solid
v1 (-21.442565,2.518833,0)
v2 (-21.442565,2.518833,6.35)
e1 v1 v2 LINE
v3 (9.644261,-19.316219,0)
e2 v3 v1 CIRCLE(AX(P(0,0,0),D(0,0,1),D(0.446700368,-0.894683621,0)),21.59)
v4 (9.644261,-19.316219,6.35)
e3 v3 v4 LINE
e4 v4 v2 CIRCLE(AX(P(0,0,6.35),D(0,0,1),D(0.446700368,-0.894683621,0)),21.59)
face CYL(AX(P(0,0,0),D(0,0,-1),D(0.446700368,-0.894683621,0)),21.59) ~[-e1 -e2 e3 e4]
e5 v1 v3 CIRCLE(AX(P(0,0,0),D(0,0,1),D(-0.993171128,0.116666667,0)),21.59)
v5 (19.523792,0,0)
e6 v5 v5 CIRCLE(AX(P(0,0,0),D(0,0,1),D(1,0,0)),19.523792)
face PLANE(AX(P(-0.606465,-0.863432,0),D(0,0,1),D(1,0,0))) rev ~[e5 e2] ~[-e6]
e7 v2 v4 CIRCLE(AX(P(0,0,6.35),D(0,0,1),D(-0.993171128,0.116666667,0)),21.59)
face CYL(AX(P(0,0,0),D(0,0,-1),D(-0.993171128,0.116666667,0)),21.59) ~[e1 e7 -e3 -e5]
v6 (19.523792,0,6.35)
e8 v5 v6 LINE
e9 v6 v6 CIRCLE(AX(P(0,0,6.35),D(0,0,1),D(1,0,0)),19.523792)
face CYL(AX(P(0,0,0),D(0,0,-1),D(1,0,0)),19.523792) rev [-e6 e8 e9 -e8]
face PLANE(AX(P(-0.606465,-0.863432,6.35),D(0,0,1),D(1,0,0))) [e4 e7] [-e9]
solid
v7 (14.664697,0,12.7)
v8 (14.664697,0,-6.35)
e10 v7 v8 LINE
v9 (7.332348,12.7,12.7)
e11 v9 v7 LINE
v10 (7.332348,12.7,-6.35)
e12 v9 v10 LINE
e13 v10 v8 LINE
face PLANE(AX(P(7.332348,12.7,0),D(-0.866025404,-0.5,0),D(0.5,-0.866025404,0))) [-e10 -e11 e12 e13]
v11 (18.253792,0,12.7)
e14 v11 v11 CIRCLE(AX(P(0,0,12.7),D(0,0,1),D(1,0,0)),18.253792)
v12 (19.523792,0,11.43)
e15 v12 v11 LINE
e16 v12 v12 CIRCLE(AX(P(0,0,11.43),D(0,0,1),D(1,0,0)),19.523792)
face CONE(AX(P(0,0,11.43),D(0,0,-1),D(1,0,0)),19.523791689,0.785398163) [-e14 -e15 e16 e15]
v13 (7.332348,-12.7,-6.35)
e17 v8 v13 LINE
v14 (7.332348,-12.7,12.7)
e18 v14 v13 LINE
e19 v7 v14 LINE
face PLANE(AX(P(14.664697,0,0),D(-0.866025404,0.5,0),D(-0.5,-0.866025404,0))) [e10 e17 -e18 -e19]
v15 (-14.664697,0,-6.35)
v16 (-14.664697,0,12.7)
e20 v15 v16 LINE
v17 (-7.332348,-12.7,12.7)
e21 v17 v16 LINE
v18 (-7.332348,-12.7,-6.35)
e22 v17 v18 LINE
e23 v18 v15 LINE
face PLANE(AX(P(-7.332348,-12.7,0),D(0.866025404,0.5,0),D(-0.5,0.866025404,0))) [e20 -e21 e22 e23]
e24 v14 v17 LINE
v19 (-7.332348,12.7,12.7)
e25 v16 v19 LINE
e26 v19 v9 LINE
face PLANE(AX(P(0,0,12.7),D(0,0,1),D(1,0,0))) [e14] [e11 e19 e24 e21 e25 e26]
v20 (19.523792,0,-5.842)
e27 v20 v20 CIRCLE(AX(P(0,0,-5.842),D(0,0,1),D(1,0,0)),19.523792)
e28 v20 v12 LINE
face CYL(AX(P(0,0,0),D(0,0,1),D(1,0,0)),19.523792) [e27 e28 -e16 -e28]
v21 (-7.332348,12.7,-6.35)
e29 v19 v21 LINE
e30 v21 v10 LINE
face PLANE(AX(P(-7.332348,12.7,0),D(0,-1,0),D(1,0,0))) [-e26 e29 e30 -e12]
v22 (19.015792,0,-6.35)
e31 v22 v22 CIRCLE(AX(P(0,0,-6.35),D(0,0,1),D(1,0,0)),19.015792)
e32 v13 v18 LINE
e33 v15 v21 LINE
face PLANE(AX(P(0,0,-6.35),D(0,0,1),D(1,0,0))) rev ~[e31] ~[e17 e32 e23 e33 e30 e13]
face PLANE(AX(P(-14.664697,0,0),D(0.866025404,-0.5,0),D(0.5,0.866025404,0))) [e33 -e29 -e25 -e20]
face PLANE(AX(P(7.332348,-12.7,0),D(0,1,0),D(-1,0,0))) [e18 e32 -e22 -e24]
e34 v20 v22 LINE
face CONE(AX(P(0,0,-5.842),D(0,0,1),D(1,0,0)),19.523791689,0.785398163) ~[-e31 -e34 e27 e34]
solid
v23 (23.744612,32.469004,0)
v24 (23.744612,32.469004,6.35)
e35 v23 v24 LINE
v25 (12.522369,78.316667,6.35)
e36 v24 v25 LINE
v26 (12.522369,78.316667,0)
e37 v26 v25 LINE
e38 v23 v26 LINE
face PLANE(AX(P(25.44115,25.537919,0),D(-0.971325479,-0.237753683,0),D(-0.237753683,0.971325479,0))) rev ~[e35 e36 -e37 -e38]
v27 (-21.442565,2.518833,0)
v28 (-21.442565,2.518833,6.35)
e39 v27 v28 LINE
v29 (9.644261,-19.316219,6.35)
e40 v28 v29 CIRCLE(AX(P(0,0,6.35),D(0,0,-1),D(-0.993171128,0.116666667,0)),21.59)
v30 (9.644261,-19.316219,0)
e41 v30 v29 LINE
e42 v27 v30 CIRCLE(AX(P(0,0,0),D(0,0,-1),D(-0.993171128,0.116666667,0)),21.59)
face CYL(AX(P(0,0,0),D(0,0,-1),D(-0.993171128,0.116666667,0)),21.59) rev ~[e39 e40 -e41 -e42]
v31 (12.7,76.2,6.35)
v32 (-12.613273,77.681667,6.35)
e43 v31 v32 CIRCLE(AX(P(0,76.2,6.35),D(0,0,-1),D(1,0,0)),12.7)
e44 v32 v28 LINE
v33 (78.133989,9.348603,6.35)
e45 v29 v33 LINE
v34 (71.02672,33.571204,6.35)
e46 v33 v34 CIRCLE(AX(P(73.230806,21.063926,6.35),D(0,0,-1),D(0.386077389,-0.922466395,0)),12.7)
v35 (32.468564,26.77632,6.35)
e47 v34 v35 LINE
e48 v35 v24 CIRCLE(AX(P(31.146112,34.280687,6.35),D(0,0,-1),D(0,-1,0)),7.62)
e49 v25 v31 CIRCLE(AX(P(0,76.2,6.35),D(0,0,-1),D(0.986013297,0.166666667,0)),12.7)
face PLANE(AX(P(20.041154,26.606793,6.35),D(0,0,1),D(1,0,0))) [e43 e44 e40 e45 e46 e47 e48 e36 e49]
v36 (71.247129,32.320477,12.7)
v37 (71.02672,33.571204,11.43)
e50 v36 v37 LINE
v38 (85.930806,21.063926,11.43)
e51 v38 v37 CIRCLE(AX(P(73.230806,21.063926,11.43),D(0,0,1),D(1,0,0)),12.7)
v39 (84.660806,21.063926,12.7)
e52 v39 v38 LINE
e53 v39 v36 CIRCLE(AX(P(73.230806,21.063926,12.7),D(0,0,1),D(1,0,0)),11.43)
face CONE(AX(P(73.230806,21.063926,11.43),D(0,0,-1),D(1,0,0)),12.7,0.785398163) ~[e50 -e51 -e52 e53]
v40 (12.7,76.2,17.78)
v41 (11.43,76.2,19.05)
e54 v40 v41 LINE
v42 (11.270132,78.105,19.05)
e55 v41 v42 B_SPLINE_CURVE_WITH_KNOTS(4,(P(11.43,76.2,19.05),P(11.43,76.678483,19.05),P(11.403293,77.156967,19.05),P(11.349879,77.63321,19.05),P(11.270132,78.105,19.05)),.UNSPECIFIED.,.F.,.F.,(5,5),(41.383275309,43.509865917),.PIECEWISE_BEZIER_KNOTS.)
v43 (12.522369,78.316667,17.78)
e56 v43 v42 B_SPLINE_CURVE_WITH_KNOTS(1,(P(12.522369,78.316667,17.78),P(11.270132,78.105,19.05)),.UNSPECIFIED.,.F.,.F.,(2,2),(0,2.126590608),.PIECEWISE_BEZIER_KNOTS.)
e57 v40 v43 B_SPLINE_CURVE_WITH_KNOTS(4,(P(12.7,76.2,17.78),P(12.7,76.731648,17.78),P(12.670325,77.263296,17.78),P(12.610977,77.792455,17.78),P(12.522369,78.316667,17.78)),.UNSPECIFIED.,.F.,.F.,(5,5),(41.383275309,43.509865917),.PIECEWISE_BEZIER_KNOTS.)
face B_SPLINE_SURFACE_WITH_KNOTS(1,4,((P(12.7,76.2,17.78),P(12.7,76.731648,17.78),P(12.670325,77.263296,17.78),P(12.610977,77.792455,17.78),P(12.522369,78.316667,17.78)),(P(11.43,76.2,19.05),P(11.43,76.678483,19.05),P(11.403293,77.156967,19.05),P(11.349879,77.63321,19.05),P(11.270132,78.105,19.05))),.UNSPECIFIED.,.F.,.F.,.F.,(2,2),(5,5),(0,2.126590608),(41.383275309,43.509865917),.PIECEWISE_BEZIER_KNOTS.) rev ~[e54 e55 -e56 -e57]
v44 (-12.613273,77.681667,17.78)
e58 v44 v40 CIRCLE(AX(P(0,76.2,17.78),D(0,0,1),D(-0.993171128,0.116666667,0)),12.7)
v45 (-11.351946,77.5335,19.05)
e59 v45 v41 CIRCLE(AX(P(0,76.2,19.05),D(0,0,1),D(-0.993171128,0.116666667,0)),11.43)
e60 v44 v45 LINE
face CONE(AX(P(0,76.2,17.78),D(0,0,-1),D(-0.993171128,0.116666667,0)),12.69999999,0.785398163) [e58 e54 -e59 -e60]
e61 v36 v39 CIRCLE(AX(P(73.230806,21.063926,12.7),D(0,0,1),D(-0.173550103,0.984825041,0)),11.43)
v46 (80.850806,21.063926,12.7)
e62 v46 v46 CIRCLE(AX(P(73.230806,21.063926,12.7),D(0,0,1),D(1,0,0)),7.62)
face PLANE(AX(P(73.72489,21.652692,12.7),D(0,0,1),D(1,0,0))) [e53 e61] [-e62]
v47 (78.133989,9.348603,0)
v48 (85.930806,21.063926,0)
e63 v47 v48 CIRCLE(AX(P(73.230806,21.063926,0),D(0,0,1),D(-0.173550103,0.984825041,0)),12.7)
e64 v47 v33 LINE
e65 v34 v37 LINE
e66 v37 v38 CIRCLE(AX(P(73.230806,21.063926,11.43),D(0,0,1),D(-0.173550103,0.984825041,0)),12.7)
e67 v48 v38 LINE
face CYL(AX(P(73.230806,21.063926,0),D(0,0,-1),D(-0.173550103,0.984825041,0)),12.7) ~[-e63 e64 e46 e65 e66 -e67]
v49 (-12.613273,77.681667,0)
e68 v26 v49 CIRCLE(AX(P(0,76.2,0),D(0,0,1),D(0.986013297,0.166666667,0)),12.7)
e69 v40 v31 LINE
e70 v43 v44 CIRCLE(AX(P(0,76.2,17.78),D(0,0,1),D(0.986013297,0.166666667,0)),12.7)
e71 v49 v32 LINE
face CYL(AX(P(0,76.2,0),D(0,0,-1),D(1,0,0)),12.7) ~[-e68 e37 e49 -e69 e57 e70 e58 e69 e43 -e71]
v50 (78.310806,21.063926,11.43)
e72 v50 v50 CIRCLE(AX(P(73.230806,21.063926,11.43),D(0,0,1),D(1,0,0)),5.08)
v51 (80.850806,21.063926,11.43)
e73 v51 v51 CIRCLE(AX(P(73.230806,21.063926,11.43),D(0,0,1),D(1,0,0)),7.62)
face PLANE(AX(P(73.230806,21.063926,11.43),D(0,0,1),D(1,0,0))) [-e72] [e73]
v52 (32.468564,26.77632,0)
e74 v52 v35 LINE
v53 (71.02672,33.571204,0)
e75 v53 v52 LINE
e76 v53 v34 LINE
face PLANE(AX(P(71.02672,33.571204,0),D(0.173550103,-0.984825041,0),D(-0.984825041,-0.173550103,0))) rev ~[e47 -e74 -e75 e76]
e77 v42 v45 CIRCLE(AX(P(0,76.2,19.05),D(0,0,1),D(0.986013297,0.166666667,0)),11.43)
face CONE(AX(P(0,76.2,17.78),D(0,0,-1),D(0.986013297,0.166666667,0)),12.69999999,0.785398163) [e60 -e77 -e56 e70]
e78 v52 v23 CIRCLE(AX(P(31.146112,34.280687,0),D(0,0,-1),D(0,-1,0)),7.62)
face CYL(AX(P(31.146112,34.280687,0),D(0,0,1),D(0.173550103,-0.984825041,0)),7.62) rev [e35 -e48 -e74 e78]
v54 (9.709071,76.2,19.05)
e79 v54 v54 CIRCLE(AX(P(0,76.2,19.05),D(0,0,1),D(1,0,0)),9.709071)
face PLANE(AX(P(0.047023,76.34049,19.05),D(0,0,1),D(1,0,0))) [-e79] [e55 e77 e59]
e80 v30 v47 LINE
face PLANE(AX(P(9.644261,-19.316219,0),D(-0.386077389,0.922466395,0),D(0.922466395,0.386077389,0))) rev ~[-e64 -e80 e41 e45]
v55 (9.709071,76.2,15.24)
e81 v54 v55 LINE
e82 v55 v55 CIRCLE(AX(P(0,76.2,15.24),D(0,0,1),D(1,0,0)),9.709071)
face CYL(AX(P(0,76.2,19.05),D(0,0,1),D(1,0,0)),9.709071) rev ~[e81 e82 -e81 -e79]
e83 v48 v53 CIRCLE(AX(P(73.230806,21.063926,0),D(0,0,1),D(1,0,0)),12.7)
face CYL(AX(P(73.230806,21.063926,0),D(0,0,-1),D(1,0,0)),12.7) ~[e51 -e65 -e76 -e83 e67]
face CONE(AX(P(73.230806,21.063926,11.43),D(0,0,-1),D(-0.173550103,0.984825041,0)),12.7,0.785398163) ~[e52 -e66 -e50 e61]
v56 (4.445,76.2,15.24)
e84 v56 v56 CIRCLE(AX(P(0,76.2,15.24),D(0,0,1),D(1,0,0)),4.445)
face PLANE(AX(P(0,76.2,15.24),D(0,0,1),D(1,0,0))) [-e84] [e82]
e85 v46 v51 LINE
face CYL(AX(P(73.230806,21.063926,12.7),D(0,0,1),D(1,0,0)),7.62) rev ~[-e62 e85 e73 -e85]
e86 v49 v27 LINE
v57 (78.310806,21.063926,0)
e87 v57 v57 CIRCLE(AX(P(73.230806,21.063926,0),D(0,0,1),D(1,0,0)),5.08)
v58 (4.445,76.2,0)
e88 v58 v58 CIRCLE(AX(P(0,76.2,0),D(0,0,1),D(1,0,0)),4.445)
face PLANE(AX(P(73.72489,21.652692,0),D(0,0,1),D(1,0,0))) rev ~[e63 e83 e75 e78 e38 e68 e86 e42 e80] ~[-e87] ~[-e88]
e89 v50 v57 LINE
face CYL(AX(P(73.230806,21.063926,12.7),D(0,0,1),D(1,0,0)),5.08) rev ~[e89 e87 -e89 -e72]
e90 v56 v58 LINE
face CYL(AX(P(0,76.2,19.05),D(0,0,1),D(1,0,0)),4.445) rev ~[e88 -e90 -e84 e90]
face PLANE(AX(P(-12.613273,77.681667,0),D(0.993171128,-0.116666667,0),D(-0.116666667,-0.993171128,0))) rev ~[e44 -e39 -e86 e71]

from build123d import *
from build123d import SkipClean  # not in build123d's __all__

# Parameters (mm, degrees)
F1_DEPTH  = 6.35
F0_R      = 19.5237916893
F2_DEPTH  = 12.7
F3_DEPTH  = 6.35
F4_DEPTH  = 12.7
F5_SIZE   = 1.27
F5_2_SIZE = 1.27
F6_R      = 4.445
F7_DEPTH  = 25.4
F8_R      = 9.7090709229
F9_DEPTH  = 3.81
F10_R     = 5.08
F11_DEPTH = 25.4
F10_R_2   = 7.62
F12_DEPTH = 1.27
F13_DEPTH = 6.35
F14_DEPTH = 6.35
F15_R     = 7.62
F16_SIZE  = 0.508


# Not quite as in the source:
# - after a boolean that leaves OpenCascade's solid faulty, fix() repairs it
# - a feature names something its author has since deleted; it is built from what else it names


with BuildPart() as f1:
    # F0 (on Top) → F1 (new body)
    with BuildSketch(Plane.XY):
        with BuildLine():
            ThreePointArc((12.5223688742, 78.3166666667), (12.6555143061, 77.2620535056), (12.7, 76.2))
            ThreePointArc((12.7, 76.2), (-0.7421013455, 63.5217002089), (-12.6132733217, 77.6816666667))
            Line((-12.6132733217, 77.6816666667), (-21.442564647, 2.5188333333))
            ThreePointArc((-21.442564647, 2.5188333333), (1.2615722873, 21.5531096449), (21.59, 0))
            ThreePointArc((21.59, 0), (18.3622941649, -11.3558026137), (9.644260954, -19.3162193674))
            Line((9.644260954, -19.3162193674), (78.13398925, 9.348603097))
            ThreePointArc((78.13398925, 9.348603097), (61.0445484479, 17.4882981523), (71.0267201121, 33.5712043384))
            Line((71.0267201121, 33.5712043384), (25.4411503373, 25.5379192568))
            Line((25.4411503373, 25.5379192568), (12.5223688742, 78.3166666667))
        make_face()
    extrude(amount=F1_DEPTH)

    # F0 (on Top) → F2, piece 2 (join)
    with BuildSketch(Plane.XY):
        with BuildLine():
            ThreePointArc((-12.6132733217, 77.6816666667), (-0.7421013455, 63.5217002089), (12.7, 76.2))
            ThreePointArc((12.7, 76.2), (12.6555143061, 77.2620535056), (12.5223688742, 78.3166666667))
            ThreePointArc((12.5223688742, 78.3166666667), (-0.3207368932, 88.8959492692), (-12.6132733217, 77.6816666667))
        make_face()
    extrude(amount=F2_DEPTH)

    # F3 (add): a face of the model
    f3_faces = [f1.faces().sort_by_distance(p)[0] for p in [
        (0, 76.2, 12.7),
    ]]
    with SkipClean():  # cleaning this boolean's faces spoils the solid; the shape is the same uncleaned
        extrude(f3_faces, amount=F3_DEPTH)

    # F0 (on Top) → F4 (join)
    with BuildSketch(Plane.XY):
        with BuildLine():
            ThreePointArc((85.9308064152, 21.0639263144), (81.3946934781, 30.792284245), (71.0267201121, 33.5712043384))
            ThreePointArc((71.0267201121, 33.5712043384), (61.0445484479, 17.4882981523), (78.13398925, 9.348603097))
            ThreePointArc((78.13398925, 9.348603097), (83.8034225059, 14.0276070352), (85.9308064152, 21.0639263144))
        make_face()
    extrude(amount=F4_DEPTH)

    add(f1.part.fix(), mode=Mode.REPLACE)

    # F5
    f5_edges = [f1.edges().sort_by_distance(p)[0] for p in [
        (-12.7, 76.2, 19.05),
        (68.327624, 32.77925, 12.7),
    ]]
    chamfer(f5_edges, length=F5_SIZE)

    # F6 (on face) → F7 (cut)
    with BuildSketch(Plane.XY.offset(19.05)):
        with Locations((0, 76.2)):
            Circle(F6_R)
    extrude(amount=-F7_DEPTH, mode=Mode.SUBTRACT)

    # F8 (on face) → F9 (cut)
    with BuildSketch(Plane.XY.offset(19.05)):
        with Locations((0, 76.2)):
            Circle(F8_R)
    extrude(amount=-F9_DEPTH, mode=Mode.SUBTRACT)

    # F10 (on face) → F11 (cut)
    with BuildSketch(Plane.XY.offset(12.7)):
        with Locations((73.2308064152, 21.0639263144)):
            Circle(F10_R)
    extrude(amount=-F11_DEPTH, mode=Mode.SUBTRACT)

    # F10 (on face) → F12 (cut)
    with BuildSketch(Plane.XY.offset(12.7)):
        with Locations((73.2308064152, 21.0639263144)):
            Circle(F10_R_2)
        with Locations((73.2308064152, 21.0639263144)):
            Circle(F10_R, mode=Mode.SUBTRACT)
    extrude(amount=-F12_DEPTH, mode=Mode.SUBTRACT)

    # F15
    f15_edges = [f1.edges().sort_by_distance(p)[0] for p in [
        (25.44115, 25.537919, 3.175),
    ]]
    fillet(f15_edges, radius=F15_R)


with BuildPart() as f2:
    # F0 (on Top) → F2 (new body)
    with BuildSketch(Plane.XY):
        Circle(F0_R)
        Polygon((-14.6646968374, 0), (-7.3323484187, 12.7), (7.3323484187, 12.7), (14.6646968374, 0), (7.3323484187, -12.7), (-7.3323484187, -12.7), align=None, mode=Mode.SUBTRACT)
    extrude(amount=F2_DEPTH)

    # F5#2
    f5_2_edges = [f2.edges().sort_by_distance(p)[0] for p in [
        (-19.523792, 0, 12.7),
    ]]
    chamfer(f5_2_edges, length=F5_2_SIZE)

    # F14 (add): a face of the model
    f14_faces = [f2.faces().sort_by_distance(p)[0] for p in [
        (-18.9715754694, 0, 0),
    ]]
    extrude(f14_faces, amount=F14_DEPTH)

    # F16
    f16_edges = [f2.edges().sort_by_distance(p)[0] for p in [
        (-19.523792, 0, -6.35),
    ]]
    chamfer(f16_edges, length=F16_SIZE)


with BuildPart() as f13:
    # F0 (on Top) → F13 (new body)
    with BuildSketch(Plane.XY):
        with BuildLine():
            ThreePointArc((21.59, 0), (1.2615722873, 21.5531096449), (-21.442564647, 2.5188333333))
            ThreePointArc((-21.442564647, 2.5188333333), (-12.4093663867, -17.6673632974), (9.644260954, -19.3162193674))
            ThreePointArc((9.644260954, -19.3162193674), (18.3622941649, -11.3558026137), (21.59, 0))
        make_face()
        Circle(F0_R, mode=Mode.SUBTRACT)
    extrude(amount=F13_DEPTH)


solid = Compound([f1.part, f2.part, f13.part])
